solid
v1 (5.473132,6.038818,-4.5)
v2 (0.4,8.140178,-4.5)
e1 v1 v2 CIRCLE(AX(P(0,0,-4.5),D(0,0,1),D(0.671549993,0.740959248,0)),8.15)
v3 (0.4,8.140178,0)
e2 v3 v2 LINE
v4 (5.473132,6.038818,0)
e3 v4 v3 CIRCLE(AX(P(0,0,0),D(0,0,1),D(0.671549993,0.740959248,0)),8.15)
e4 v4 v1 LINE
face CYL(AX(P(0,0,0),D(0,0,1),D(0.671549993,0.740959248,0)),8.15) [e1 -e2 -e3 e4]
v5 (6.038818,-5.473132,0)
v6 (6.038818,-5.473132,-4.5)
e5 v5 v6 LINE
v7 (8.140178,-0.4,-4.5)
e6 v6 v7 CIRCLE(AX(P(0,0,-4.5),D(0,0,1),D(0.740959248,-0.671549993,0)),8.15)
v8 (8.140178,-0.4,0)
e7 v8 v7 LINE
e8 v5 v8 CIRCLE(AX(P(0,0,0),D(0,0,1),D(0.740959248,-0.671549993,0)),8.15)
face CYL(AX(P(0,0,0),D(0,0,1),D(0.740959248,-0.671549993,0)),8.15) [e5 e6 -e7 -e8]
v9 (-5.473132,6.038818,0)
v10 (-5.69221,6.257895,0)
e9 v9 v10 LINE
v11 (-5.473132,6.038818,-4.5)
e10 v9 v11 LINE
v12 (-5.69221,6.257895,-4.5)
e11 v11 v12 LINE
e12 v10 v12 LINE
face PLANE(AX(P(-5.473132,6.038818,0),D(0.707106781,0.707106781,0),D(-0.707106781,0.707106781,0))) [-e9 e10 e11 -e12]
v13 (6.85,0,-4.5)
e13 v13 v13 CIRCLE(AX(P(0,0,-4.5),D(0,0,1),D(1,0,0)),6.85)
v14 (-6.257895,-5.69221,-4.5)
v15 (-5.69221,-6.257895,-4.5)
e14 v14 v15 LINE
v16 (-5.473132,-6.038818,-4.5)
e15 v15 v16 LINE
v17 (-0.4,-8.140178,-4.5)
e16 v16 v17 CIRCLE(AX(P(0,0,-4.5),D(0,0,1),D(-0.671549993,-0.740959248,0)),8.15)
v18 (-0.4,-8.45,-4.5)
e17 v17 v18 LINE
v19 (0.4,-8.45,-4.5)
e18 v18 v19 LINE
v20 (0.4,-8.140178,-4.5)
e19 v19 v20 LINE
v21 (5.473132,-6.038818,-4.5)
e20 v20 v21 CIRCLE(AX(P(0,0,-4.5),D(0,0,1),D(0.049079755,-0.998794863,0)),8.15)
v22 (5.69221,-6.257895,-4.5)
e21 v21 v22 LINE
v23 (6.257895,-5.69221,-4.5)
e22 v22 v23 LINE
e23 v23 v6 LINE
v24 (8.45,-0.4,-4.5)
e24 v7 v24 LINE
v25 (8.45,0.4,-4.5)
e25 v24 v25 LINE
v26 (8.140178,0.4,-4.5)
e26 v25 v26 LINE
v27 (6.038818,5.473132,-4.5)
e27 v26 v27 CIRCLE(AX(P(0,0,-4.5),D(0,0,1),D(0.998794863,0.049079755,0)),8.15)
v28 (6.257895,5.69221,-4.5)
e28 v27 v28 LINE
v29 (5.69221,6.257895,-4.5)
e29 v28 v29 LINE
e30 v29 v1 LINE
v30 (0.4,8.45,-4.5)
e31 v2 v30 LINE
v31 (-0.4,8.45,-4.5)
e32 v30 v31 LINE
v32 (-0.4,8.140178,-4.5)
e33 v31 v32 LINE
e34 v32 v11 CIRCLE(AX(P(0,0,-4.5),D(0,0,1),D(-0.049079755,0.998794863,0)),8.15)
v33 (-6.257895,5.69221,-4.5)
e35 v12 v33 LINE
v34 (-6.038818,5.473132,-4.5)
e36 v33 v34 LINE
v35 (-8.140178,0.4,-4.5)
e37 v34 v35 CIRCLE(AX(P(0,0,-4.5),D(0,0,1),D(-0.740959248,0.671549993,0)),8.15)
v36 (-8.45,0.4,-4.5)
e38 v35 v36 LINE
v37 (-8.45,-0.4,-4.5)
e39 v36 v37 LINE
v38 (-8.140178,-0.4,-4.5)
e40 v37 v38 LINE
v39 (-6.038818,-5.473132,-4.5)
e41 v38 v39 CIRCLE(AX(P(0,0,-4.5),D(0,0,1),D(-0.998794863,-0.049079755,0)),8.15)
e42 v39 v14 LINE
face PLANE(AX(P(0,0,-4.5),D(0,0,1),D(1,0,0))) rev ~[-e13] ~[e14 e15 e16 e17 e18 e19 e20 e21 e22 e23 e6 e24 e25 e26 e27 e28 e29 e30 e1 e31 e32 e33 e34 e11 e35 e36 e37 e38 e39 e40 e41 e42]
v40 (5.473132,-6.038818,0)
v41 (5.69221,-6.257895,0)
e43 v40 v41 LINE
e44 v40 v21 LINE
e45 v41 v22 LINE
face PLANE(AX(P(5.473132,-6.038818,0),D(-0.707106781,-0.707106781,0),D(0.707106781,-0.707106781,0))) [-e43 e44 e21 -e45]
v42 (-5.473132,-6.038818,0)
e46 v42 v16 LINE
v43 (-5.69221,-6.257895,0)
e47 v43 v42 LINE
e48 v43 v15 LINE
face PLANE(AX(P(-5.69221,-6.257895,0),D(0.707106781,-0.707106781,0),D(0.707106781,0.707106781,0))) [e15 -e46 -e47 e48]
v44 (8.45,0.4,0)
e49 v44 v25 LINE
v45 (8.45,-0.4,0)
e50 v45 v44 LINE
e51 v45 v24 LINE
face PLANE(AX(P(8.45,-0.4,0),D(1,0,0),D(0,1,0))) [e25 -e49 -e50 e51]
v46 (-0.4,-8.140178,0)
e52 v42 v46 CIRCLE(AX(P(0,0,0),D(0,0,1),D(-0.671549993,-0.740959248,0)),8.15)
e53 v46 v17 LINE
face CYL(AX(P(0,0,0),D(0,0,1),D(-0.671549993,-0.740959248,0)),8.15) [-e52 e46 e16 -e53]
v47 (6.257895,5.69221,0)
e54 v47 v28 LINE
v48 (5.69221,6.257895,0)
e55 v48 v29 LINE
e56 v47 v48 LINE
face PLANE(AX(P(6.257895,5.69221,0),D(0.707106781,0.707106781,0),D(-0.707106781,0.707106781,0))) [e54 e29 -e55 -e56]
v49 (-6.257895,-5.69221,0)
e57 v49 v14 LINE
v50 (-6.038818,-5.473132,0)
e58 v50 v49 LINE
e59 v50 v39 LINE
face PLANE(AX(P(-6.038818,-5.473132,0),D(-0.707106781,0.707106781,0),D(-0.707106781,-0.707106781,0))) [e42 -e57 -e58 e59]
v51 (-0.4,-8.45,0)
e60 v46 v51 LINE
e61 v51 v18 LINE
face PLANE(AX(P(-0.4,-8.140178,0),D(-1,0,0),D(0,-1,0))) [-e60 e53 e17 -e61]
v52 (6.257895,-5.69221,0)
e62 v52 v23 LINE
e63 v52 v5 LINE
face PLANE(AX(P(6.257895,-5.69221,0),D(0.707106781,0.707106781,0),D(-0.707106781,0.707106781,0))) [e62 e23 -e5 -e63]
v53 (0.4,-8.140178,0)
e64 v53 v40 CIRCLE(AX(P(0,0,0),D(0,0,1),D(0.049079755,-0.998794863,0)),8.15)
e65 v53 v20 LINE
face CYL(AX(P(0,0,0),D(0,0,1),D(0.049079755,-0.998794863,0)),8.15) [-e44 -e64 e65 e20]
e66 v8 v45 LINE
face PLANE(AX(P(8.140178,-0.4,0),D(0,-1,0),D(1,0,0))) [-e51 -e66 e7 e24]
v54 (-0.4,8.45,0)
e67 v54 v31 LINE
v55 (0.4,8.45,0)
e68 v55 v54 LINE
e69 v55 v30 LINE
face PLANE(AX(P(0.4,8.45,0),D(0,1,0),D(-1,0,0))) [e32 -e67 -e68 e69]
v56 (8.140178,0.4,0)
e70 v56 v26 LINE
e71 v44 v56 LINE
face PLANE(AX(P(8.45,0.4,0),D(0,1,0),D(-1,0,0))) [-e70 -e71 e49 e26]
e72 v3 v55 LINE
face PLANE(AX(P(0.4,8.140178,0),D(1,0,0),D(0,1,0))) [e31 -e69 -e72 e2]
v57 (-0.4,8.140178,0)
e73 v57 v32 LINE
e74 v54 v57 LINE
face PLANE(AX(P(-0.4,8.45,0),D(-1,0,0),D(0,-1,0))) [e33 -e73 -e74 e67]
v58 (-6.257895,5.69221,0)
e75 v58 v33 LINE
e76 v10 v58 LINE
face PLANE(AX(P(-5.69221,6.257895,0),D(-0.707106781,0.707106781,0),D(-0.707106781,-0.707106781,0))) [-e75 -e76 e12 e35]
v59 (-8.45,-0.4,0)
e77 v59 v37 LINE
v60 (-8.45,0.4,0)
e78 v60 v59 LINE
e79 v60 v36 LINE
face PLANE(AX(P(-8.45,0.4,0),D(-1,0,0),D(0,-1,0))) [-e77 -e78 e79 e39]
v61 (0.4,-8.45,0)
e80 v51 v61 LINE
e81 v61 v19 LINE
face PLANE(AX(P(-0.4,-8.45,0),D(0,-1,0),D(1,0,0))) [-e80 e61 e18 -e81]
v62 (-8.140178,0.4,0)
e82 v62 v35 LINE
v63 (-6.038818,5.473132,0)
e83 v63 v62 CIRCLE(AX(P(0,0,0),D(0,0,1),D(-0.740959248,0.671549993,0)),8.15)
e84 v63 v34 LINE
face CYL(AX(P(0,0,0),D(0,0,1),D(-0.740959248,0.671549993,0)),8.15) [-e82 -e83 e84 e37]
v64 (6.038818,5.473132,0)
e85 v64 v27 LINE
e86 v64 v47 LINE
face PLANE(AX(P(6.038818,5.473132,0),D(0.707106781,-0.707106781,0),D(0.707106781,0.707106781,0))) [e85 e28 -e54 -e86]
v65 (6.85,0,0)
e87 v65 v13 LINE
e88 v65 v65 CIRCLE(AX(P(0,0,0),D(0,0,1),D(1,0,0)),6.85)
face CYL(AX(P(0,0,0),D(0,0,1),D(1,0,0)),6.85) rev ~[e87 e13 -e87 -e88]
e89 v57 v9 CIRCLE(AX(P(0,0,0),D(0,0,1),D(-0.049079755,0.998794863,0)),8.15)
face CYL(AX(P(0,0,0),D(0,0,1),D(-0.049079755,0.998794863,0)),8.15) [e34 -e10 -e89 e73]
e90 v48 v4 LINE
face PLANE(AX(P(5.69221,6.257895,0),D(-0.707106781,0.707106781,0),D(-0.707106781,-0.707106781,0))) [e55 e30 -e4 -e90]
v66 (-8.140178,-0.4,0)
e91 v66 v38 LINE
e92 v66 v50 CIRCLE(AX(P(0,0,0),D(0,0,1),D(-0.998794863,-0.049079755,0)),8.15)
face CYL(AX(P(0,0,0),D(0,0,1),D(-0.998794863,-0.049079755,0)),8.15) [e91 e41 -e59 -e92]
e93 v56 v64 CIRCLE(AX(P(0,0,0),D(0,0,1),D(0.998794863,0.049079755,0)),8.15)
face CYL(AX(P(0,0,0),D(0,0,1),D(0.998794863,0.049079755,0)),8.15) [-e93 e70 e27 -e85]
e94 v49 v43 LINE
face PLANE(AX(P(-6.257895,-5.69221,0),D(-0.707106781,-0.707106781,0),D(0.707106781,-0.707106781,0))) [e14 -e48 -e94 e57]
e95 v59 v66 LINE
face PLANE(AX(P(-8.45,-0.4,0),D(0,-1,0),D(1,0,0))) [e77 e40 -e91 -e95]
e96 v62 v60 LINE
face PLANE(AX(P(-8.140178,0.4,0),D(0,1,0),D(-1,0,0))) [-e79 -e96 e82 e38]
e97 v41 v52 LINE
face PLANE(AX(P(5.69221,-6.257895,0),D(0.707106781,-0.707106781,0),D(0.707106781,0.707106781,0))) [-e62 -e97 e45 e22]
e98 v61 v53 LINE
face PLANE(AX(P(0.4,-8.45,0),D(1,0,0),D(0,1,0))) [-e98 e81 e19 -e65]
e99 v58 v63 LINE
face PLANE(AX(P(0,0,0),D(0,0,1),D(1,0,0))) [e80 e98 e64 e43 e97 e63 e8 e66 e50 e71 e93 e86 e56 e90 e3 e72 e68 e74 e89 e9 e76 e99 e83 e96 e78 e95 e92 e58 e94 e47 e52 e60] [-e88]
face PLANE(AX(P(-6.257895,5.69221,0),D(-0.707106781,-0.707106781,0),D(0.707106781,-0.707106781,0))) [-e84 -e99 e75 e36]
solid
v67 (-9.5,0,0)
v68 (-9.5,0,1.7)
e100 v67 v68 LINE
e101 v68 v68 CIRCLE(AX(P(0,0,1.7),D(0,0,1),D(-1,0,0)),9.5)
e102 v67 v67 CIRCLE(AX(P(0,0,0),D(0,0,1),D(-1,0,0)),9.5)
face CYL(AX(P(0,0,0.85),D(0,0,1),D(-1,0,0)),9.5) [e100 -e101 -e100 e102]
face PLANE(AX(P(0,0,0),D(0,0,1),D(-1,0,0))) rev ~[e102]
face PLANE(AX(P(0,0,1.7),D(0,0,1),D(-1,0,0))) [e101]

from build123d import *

# Parameters (mm, degrees)
F0_R     = 6.85
F1_DEPTH = 4.5
F2_W     = 9.5
F2_H     = 1.7
F3_ANGLE = 180


# Not quite as in the source:
# - a feature names something its author has since deleted; it is built from what else it names


with BuildPart() as f1:
    # F0 (on Top) → F1 (new body)
    with BuildSketch(Plane.XY):
        with BuildLine():
            Line((-0.4, 8.45), (-0.4, 8.1401781307))
            ThreePointArc((-0.4, 8.1401781307), (-3.1188699738, 7.52961819), (-5.4731324438, 6.0388178688))
            Line((-5.4731324438, 6.0388178688), (-5.6922095886, 6.2578950135))
            Line((-5.6922095886, 6.2578950135), (-6.2578950135, 5.6922095886))
            Line((-6.2578950135, 5.6922095886), (-6.0388178688, 5.4731324438))
            ThreePointArc((-6.0388178688, 5.4731324438), (-7.52961819, 3.1188699738), (-8.1401781307, 0.4))
            Line((-8.1401781307, 0.4), (-8.45, 0.4))
            Line((-8.45, 0.4), (-8.45, -0.4))
            Line((-8.45, -0.4), (-8.1401781307, -0.4))
            ThreePointArc((-8.1401781307, -0.4), (-7.52961819, -3.1188699738), (-6.0388178688, -5.4731324438))
            Line((-6.0388178688, -5.4731324438), (-6.2578950135, -5.6922095886))
            Line((-6.2578950135, -5.6922095886), (-5.6922095886, -6.2578950135))
            Line((-5.6922095886, -6.2578950135), (-5.4731324438, -6.0388178688))
            ThreePointArc((-5.4731324438, -6.0388178688), (-3.1188699738, -7.52961819), (-0.4, -8.1401781307))
            Line((-0.4, -8.1401781307), (-0.4, -8.45))
            Line((-0.4, -8.45), (0.4, -8.45))
            Line((0.4, -8.45), (0.4, -8.1401781307))
            ThreePointArc((0.4, -8.1401781307), (3.1188699738, -7.52961819), (5.4731324438, -6.0388178688))
            Line((5.4731324438, -6.0388178688), (5.6922095886, -6.2578950135))
            Line((5.6922095886, -6.2578950135), (6.2578950135, -5.6922095886))
            Line((6.2578950135, -5.6922095886), (6.0388178688, -5.4731324438))
            ThreePointArc((6.0388178688, -5.4731324438), (7.52961819, -3.1188699738), (8.1401781307, -0.4))
            Line((8.1401781307, -0.4), (8.45, -0.4))
            Line((8.45, -0.4), (8.45, 0.4))
            Line((8.45, 0.4), (8.1401781307, 0.4))
            ThreePointArc((8.1401781307, 0.4), (7.52961819, 3.1188699738), (6.0388178688, 5.4731324438))
            Line((6.0388178688, 5.4731324438), (6.2578950135, 5.6922095886))
            Line((6.2578950135, 5.6922095886), (5.6922095886, 6.2578950135))
            Line((5.6922095886, 6.2578950135), (5.4731324438, 6.0388178688))
            ThreePointArc((5.4731324438, 6.0388178688), (3.1188699738, 7.52961819), (0.4, 8.1401781307))
            Line((0.4, 8.1401781307), (0.4, 8.45))
            Line((0.4, 8.45), (-0.4, 8.45))
        make_face()
        Circle(F0_R, mode=Mode.SUBTRACT)
    extrude(amount=-F1_DEPTH)


with BuildPart() as f3:
    # F2 (on Front) → F3 (revolve)
    with BuildSketch(Plane.XZ):
        with Locations((-4.75, 0.85)):
            Rectangle(F2_W, F2_H)
    revolve(axis=Axis((0, 0, 0.85), (0, 0, 1)), revolution_arc=F3_ANGLE)


with BuildPart() as f4:
    # F2 (on Front) → F4 (revolve)
    with BuildSketch(Plane.XZ):
        with Locations((-4.75, 0.85)):
            Rectangle(F2_W, F2_H)
    revolve(axis=Axis((0, 0, 0.85), (0, 0, 1)))


solid = Compound([f1.part, f4.part])
